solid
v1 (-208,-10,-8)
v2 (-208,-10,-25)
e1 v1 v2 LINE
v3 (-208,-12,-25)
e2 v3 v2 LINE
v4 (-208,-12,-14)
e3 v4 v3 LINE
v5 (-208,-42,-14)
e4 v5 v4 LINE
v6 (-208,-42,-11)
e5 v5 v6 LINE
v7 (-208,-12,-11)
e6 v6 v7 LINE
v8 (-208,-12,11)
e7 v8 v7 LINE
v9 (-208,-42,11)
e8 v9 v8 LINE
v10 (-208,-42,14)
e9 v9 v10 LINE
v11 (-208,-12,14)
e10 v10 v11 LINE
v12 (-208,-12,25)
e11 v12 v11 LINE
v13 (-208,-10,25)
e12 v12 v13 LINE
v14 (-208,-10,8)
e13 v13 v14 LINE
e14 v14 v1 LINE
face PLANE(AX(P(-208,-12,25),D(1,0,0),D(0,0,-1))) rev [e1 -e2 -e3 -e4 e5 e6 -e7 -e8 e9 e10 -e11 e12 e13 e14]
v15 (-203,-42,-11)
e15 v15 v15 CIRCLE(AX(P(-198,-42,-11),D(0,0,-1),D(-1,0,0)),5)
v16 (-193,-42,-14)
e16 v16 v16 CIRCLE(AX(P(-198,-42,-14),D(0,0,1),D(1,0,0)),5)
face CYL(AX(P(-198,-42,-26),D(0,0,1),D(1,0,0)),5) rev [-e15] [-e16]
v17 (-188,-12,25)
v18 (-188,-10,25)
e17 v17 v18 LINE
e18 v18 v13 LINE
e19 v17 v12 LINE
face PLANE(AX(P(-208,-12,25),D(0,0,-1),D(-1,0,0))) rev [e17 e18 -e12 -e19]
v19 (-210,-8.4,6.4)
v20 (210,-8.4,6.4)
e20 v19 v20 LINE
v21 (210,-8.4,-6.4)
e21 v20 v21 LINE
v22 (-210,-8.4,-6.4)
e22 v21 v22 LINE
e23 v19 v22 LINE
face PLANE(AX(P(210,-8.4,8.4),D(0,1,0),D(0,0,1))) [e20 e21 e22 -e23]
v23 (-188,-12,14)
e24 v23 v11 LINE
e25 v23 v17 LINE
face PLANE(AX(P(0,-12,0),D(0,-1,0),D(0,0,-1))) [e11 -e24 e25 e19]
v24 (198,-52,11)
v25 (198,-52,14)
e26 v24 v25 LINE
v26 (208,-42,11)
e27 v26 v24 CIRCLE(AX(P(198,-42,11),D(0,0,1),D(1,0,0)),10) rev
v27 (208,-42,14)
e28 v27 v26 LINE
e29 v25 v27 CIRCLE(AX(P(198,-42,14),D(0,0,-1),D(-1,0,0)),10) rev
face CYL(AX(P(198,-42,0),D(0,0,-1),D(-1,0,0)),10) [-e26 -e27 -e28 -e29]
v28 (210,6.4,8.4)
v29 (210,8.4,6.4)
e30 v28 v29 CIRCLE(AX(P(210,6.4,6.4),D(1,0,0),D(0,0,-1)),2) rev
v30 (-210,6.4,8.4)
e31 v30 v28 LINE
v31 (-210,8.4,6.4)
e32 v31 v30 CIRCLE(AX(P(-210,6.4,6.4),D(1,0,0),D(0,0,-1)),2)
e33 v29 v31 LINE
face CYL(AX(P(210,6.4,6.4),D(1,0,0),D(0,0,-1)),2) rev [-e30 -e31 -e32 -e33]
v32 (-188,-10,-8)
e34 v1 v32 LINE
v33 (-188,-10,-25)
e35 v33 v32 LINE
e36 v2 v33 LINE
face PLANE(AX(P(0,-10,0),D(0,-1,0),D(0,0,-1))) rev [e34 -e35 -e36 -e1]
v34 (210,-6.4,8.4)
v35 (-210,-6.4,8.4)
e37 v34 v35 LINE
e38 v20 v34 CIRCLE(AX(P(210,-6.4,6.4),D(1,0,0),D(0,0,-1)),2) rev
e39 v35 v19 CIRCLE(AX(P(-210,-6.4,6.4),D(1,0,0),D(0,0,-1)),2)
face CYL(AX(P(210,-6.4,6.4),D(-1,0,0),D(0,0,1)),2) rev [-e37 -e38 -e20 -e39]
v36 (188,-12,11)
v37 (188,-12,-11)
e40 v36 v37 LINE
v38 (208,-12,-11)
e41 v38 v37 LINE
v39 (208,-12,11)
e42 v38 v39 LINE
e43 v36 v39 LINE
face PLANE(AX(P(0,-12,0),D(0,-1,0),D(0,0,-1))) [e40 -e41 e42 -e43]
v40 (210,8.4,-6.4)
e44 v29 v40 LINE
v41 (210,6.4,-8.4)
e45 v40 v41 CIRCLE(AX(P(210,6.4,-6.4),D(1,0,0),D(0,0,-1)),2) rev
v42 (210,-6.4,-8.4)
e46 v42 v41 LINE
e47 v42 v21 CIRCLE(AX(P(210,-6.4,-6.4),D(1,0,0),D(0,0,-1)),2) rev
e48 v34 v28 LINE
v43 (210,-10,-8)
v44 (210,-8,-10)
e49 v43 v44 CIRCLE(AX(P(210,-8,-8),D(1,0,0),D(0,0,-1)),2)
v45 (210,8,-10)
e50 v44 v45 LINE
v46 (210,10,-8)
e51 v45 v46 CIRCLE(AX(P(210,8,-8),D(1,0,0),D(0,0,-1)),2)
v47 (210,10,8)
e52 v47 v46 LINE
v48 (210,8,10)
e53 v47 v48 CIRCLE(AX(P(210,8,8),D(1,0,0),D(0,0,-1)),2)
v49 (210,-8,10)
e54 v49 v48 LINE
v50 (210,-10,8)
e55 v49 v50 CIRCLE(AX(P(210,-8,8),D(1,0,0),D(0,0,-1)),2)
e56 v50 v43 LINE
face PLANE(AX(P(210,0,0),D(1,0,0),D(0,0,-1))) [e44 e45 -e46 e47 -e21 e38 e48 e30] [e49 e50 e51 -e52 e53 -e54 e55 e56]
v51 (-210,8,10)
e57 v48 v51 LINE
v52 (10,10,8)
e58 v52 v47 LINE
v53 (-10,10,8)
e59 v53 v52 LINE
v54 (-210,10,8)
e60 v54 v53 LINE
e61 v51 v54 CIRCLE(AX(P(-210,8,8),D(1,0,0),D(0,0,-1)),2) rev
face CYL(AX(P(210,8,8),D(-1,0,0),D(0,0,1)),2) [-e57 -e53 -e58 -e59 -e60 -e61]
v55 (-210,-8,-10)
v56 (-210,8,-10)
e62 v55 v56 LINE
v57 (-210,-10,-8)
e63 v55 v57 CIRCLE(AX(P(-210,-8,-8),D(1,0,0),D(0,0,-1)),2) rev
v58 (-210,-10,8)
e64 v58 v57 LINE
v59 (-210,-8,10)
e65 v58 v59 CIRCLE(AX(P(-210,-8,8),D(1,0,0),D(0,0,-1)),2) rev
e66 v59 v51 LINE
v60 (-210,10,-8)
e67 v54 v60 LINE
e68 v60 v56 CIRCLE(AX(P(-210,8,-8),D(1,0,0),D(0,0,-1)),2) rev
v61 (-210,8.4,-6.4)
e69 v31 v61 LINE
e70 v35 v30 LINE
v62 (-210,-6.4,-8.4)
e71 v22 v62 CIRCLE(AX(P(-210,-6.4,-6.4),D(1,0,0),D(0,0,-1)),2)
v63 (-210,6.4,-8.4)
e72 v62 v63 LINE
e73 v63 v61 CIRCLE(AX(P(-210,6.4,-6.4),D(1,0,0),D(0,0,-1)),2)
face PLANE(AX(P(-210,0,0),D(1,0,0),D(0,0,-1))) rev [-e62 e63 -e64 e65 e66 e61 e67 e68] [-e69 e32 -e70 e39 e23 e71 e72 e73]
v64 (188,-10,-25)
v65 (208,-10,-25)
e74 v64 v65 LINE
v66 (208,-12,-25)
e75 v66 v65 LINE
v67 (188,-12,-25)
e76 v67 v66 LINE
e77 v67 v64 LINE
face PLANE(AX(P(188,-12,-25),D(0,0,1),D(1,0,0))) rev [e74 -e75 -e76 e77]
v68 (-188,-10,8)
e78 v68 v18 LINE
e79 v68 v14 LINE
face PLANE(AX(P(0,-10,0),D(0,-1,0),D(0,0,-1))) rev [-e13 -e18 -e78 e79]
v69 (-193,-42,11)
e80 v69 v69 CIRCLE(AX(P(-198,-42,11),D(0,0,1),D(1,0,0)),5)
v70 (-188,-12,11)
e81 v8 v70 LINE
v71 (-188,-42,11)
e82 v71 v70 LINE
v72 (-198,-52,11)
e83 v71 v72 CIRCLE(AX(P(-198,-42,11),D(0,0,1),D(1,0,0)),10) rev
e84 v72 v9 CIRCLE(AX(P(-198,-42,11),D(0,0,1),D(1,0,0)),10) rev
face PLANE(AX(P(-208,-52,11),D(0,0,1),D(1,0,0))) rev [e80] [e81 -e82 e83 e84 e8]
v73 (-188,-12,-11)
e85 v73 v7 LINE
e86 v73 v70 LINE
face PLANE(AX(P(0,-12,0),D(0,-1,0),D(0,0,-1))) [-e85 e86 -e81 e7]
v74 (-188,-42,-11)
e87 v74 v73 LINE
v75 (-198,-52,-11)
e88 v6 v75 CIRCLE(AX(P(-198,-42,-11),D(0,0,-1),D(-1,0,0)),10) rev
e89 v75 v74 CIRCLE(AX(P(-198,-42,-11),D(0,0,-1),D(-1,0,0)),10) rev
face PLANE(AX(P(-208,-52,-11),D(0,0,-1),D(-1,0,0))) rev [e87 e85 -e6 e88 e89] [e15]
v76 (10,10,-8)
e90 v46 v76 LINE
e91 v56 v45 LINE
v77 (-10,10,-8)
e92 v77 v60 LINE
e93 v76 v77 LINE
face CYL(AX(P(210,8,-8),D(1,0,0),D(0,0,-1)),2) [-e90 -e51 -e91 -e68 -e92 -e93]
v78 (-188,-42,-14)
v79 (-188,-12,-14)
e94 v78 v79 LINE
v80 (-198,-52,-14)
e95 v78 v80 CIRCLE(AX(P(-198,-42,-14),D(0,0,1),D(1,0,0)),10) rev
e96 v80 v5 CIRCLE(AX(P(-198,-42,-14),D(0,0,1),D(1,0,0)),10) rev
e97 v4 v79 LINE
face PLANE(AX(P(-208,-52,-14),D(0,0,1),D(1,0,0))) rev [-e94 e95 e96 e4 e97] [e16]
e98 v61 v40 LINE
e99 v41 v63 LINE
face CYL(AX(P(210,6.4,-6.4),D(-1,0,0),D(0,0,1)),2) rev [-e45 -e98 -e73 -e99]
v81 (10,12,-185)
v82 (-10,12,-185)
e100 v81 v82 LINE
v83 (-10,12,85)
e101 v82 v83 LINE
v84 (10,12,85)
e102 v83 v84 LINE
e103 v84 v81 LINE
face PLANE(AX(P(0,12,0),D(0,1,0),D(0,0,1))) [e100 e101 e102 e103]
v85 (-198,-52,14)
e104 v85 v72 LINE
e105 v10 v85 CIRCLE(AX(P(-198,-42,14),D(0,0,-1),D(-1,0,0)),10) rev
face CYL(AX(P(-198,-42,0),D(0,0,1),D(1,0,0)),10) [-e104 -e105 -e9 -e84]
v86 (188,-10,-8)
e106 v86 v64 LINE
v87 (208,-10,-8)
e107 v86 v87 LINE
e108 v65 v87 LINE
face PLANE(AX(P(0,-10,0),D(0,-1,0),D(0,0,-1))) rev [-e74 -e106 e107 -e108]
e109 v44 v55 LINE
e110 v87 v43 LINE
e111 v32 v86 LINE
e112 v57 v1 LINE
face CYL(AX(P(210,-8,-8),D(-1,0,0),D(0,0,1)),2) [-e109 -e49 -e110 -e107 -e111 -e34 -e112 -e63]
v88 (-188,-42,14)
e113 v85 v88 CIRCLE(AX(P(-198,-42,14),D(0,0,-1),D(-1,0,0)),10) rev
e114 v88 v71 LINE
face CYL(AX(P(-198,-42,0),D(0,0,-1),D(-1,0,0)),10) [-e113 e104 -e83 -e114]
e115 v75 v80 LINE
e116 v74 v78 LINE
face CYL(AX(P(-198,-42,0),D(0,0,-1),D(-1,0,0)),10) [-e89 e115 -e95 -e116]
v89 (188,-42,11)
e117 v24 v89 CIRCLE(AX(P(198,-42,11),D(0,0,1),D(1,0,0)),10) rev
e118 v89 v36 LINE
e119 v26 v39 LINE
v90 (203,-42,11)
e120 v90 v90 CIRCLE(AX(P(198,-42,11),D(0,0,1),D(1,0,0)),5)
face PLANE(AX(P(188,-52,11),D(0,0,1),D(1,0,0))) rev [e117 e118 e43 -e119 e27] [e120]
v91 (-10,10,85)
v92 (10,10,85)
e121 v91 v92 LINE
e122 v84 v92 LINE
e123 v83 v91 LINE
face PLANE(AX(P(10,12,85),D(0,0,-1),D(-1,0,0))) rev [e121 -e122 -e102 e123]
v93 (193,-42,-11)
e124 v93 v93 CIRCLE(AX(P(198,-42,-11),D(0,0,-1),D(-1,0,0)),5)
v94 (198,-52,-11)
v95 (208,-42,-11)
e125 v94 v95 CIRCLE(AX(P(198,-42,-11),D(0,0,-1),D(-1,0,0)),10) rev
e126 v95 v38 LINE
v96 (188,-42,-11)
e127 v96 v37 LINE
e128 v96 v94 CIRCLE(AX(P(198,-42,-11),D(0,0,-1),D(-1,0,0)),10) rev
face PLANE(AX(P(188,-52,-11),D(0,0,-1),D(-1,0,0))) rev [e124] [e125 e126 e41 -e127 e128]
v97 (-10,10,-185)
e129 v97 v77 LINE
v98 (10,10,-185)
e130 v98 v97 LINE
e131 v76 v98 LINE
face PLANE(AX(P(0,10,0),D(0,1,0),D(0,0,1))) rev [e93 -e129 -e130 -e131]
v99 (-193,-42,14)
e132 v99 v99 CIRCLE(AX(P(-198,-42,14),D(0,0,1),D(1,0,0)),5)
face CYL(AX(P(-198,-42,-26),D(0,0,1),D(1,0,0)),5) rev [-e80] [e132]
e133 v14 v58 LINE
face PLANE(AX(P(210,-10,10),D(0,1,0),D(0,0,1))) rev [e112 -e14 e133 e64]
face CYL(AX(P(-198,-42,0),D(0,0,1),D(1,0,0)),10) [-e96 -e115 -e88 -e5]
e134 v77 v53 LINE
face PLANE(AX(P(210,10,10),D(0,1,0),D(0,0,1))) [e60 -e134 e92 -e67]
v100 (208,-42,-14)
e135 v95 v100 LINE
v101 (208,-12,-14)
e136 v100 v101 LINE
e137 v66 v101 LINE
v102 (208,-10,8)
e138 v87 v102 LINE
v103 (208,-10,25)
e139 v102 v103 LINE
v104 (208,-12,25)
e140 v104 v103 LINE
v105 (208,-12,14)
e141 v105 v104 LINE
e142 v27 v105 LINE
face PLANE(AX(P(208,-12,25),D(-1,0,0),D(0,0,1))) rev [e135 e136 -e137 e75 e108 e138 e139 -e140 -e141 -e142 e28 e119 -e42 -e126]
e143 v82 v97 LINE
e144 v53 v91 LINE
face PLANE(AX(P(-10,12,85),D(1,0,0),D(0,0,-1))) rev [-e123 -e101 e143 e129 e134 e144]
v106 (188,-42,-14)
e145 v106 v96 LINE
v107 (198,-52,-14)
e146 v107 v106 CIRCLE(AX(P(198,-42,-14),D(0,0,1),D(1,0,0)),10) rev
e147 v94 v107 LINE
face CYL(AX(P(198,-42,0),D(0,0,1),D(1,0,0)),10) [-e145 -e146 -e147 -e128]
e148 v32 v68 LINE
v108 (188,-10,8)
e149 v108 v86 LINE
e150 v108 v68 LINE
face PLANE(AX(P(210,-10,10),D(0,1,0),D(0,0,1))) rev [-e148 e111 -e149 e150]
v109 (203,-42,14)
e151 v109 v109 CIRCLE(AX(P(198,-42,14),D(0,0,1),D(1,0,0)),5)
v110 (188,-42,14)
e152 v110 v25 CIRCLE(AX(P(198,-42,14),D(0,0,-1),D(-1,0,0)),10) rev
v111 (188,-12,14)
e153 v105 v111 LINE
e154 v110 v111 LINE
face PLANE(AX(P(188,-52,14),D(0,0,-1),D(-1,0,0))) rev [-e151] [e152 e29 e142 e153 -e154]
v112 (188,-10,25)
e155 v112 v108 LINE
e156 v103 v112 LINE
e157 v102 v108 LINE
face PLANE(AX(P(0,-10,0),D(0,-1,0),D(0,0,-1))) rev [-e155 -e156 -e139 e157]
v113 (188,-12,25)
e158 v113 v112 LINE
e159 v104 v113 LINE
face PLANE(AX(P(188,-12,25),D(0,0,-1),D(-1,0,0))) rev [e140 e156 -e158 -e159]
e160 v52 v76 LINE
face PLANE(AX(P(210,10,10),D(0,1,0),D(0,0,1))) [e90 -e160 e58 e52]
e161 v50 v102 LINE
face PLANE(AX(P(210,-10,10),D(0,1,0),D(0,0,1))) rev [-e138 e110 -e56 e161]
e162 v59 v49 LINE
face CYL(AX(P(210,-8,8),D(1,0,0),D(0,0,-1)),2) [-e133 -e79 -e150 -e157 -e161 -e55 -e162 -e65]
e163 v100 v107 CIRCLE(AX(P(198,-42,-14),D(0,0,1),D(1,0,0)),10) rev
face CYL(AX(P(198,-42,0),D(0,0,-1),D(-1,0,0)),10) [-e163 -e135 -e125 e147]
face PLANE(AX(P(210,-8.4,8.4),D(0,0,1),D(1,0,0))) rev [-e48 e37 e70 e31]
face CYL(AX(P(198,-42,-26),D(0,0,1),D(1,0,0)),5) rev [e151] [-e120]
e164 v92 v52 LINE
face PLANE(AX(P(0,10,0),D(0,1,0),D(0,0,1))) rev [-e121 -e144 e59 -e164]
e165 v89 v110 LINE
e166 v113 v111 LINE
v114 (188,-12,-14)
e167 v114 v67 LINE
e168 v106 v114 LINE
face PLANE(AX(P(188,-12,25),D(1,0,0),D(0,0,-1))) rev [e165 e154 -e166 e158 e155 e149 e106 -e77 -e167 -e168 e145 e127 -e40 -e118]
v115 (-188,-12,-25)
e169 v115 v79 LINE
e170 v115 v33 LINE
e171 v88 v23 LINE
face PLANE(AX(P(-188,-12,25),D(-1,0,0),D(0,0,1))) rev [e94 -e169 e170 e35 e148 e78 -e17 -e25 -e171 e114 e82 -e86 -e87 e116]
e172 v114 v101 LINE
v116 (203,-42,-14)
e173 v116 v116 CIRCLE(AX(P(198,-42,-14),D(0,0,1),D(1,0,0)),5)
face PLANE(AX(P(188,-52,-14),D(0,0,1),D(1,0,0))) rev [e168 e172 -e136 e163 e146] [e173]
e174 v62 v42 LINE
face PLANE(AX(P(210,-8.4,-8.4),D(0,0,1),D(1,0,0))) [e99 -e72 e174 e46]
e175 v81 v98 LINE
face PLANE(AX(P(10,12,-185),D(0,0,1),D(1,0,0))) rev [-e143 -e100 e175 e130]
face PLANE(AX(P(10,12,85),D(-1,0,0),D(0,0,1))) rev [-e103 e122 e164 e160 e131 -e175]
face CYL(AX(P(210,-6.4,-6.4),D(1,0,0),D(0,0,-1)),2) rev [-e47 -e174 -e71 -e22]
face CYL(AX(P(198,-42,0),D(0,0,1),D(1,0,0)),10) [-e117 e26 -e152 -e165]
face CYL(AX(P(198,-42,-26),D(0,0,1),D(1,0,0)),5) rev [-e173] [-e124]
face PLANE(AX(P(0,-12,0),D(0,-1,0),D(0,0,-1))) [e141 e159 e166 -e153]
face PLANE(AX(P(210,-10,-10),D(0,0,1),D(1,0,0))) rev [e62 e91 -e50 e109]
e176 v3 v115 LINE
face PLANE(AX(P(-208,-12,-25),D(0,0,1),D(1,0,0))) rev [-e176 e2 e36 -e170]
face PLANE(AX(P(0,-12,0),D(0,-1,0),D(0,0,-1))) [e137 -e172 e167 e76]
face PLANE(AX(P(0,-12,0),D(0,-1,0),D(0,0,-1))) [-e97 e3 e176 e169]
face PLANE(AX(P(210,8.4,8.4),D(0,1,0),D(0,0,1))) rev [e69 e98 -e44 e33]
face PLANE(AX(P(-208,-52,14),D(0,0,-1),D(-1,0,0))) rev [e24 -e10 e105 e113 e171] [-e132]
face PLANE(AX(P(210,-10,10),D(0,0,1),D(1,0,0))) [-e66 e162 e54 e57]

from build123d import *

# Parameters (mm, degrees)
SKETCH2_W           = 20
SKETCH2_H           = 20
SKETCH2_W_2         = 16.8
SKETCH2_H_2         = 16.8
BOSS_EXTRUDE1_DEPTH = 210
FILLET1_R           = 2
SKETCH3_W           = 20
SKETCH3_H           = 50
BOSS_EXTRUDE2_DEPTH = 2
SKETCH4_W           = 20
SKETCH4_H           = 3
BOSS_EXTRUDE3_DEPTH = 40
FILLET2_R           = 10
SKETCH5_R           = 5
CUT_EXTRUDE1_DEPTH  = 40
SKETCH6_W           = 20
SKETCH6_H           = 270
BOSS_EXTRUDE4_DEPTH = 2


with BuildPart() as part:
    # Sketch2 → Boss-Extrude1 (new, symmetric)
    with BuildSketch(Plane(origin=(0, 0, 0), x_dir=(0, 0, -1), z_dir=(1, 0, 0))):
        Rectangle(SKETCH2_W, SKETCH2_H)
        Rectangle(SKETCH2_W_2, SKETCH2_H_2, mode=Mode.SUBTRACT)
    extrude(amount=BOSS_EXTRUDE1_DEPTH, both=True)

    # Fillet1
    fillet1_edges = [part.edges().sort_by_distance(p)[0] for p in [
        (0, 8.4, 8.4),
        (0, -8.4, 8.4),
        (0, -8.4, -8.4),
        (0, 8.4, -8.4),
        (0, 10, 10),
        (0, -10, 10),
        (0, -10, -10),
        (0, 10, -10),
    ]]
    fillet(fillet1_edges, radius=FILLET1_R)

    # Sketch3 → Boss-Extrude2 (add)
    with BuildSketch(Plane.XZ.offset(10)):
        with Locations((-198, 0)):
            Rectangle(SKETCH3_W, SKETCH3_H)
        with Locations((198, 0)):
            Rectangle(SKETCH3_W, SKETCH3_H)
    extrude(amount=BOSS_EXTRUDE2_DEPTH)

    # Sketch4 → Boss-Extrude3 (add)
    with BuildSketch(Plane.XZ.offset(12)):
        with Locations((-198, 12.5)):
            Rectangle(SKETCH4_W, SKETCH4_H)
        with Locations((-198, -12.5)):
            Rectangle(SKETCH4_W, SKETCH4_H)
        with Locations((198, 12.5)):
            Rectangle(SKETCH4_W, SKETCH4_H)
        with Locations((198, -12.5)):
            Rectangle(SKETCH4_W, SKETCH4_H)
    extrude(amount=BOSS_EXTRUDE3_DEPTH)

    # Fillet2
    fillet2_edges = [part.edges().sort_by_distance(p)[0] for p in [
        (188, -52, 12.5),
        (208, -52, 12.5),
        (208, -52, -12.5),
        (188, -52, -12.5),
        (-188, -52, 12.5),
        (-188, -52, -12.5),
        (-208, -52, 12.5),
        (-208, -52, -12.5),
    ]]
    fillet(fillet2_edges, radius=FILLET2_R - 0.0001)  # a hair under: the kernel refuses the full size

    # Sketch5 → Cut-Extrude1 (cut)
    with BuildSketch(Plane.XY.offset(14)):
        with Locations((-198, -42)):
            Circle(SKETCH5_R)
        with Locations((198, -42)):
            Circle(SKETCH5_R)
    extrude(amount=-CUT_EXTRUDE1_DEPTH, mode=Mode.SUBTRACT)

    # Sketch6 → Boss-Extrude4 (add)
    with BuildSketch(Plane(origin=(0, 10, 0), x_dir=(1, 0, 0), z_dir=(0, 1, 0))):
        with Locations((0, 50)):
            Rectangle(SKETCH6_W, SKETCH6_H)
    extrude(amount=BOSS_EXTRUDE4_DEPTH)


solid = part.part
